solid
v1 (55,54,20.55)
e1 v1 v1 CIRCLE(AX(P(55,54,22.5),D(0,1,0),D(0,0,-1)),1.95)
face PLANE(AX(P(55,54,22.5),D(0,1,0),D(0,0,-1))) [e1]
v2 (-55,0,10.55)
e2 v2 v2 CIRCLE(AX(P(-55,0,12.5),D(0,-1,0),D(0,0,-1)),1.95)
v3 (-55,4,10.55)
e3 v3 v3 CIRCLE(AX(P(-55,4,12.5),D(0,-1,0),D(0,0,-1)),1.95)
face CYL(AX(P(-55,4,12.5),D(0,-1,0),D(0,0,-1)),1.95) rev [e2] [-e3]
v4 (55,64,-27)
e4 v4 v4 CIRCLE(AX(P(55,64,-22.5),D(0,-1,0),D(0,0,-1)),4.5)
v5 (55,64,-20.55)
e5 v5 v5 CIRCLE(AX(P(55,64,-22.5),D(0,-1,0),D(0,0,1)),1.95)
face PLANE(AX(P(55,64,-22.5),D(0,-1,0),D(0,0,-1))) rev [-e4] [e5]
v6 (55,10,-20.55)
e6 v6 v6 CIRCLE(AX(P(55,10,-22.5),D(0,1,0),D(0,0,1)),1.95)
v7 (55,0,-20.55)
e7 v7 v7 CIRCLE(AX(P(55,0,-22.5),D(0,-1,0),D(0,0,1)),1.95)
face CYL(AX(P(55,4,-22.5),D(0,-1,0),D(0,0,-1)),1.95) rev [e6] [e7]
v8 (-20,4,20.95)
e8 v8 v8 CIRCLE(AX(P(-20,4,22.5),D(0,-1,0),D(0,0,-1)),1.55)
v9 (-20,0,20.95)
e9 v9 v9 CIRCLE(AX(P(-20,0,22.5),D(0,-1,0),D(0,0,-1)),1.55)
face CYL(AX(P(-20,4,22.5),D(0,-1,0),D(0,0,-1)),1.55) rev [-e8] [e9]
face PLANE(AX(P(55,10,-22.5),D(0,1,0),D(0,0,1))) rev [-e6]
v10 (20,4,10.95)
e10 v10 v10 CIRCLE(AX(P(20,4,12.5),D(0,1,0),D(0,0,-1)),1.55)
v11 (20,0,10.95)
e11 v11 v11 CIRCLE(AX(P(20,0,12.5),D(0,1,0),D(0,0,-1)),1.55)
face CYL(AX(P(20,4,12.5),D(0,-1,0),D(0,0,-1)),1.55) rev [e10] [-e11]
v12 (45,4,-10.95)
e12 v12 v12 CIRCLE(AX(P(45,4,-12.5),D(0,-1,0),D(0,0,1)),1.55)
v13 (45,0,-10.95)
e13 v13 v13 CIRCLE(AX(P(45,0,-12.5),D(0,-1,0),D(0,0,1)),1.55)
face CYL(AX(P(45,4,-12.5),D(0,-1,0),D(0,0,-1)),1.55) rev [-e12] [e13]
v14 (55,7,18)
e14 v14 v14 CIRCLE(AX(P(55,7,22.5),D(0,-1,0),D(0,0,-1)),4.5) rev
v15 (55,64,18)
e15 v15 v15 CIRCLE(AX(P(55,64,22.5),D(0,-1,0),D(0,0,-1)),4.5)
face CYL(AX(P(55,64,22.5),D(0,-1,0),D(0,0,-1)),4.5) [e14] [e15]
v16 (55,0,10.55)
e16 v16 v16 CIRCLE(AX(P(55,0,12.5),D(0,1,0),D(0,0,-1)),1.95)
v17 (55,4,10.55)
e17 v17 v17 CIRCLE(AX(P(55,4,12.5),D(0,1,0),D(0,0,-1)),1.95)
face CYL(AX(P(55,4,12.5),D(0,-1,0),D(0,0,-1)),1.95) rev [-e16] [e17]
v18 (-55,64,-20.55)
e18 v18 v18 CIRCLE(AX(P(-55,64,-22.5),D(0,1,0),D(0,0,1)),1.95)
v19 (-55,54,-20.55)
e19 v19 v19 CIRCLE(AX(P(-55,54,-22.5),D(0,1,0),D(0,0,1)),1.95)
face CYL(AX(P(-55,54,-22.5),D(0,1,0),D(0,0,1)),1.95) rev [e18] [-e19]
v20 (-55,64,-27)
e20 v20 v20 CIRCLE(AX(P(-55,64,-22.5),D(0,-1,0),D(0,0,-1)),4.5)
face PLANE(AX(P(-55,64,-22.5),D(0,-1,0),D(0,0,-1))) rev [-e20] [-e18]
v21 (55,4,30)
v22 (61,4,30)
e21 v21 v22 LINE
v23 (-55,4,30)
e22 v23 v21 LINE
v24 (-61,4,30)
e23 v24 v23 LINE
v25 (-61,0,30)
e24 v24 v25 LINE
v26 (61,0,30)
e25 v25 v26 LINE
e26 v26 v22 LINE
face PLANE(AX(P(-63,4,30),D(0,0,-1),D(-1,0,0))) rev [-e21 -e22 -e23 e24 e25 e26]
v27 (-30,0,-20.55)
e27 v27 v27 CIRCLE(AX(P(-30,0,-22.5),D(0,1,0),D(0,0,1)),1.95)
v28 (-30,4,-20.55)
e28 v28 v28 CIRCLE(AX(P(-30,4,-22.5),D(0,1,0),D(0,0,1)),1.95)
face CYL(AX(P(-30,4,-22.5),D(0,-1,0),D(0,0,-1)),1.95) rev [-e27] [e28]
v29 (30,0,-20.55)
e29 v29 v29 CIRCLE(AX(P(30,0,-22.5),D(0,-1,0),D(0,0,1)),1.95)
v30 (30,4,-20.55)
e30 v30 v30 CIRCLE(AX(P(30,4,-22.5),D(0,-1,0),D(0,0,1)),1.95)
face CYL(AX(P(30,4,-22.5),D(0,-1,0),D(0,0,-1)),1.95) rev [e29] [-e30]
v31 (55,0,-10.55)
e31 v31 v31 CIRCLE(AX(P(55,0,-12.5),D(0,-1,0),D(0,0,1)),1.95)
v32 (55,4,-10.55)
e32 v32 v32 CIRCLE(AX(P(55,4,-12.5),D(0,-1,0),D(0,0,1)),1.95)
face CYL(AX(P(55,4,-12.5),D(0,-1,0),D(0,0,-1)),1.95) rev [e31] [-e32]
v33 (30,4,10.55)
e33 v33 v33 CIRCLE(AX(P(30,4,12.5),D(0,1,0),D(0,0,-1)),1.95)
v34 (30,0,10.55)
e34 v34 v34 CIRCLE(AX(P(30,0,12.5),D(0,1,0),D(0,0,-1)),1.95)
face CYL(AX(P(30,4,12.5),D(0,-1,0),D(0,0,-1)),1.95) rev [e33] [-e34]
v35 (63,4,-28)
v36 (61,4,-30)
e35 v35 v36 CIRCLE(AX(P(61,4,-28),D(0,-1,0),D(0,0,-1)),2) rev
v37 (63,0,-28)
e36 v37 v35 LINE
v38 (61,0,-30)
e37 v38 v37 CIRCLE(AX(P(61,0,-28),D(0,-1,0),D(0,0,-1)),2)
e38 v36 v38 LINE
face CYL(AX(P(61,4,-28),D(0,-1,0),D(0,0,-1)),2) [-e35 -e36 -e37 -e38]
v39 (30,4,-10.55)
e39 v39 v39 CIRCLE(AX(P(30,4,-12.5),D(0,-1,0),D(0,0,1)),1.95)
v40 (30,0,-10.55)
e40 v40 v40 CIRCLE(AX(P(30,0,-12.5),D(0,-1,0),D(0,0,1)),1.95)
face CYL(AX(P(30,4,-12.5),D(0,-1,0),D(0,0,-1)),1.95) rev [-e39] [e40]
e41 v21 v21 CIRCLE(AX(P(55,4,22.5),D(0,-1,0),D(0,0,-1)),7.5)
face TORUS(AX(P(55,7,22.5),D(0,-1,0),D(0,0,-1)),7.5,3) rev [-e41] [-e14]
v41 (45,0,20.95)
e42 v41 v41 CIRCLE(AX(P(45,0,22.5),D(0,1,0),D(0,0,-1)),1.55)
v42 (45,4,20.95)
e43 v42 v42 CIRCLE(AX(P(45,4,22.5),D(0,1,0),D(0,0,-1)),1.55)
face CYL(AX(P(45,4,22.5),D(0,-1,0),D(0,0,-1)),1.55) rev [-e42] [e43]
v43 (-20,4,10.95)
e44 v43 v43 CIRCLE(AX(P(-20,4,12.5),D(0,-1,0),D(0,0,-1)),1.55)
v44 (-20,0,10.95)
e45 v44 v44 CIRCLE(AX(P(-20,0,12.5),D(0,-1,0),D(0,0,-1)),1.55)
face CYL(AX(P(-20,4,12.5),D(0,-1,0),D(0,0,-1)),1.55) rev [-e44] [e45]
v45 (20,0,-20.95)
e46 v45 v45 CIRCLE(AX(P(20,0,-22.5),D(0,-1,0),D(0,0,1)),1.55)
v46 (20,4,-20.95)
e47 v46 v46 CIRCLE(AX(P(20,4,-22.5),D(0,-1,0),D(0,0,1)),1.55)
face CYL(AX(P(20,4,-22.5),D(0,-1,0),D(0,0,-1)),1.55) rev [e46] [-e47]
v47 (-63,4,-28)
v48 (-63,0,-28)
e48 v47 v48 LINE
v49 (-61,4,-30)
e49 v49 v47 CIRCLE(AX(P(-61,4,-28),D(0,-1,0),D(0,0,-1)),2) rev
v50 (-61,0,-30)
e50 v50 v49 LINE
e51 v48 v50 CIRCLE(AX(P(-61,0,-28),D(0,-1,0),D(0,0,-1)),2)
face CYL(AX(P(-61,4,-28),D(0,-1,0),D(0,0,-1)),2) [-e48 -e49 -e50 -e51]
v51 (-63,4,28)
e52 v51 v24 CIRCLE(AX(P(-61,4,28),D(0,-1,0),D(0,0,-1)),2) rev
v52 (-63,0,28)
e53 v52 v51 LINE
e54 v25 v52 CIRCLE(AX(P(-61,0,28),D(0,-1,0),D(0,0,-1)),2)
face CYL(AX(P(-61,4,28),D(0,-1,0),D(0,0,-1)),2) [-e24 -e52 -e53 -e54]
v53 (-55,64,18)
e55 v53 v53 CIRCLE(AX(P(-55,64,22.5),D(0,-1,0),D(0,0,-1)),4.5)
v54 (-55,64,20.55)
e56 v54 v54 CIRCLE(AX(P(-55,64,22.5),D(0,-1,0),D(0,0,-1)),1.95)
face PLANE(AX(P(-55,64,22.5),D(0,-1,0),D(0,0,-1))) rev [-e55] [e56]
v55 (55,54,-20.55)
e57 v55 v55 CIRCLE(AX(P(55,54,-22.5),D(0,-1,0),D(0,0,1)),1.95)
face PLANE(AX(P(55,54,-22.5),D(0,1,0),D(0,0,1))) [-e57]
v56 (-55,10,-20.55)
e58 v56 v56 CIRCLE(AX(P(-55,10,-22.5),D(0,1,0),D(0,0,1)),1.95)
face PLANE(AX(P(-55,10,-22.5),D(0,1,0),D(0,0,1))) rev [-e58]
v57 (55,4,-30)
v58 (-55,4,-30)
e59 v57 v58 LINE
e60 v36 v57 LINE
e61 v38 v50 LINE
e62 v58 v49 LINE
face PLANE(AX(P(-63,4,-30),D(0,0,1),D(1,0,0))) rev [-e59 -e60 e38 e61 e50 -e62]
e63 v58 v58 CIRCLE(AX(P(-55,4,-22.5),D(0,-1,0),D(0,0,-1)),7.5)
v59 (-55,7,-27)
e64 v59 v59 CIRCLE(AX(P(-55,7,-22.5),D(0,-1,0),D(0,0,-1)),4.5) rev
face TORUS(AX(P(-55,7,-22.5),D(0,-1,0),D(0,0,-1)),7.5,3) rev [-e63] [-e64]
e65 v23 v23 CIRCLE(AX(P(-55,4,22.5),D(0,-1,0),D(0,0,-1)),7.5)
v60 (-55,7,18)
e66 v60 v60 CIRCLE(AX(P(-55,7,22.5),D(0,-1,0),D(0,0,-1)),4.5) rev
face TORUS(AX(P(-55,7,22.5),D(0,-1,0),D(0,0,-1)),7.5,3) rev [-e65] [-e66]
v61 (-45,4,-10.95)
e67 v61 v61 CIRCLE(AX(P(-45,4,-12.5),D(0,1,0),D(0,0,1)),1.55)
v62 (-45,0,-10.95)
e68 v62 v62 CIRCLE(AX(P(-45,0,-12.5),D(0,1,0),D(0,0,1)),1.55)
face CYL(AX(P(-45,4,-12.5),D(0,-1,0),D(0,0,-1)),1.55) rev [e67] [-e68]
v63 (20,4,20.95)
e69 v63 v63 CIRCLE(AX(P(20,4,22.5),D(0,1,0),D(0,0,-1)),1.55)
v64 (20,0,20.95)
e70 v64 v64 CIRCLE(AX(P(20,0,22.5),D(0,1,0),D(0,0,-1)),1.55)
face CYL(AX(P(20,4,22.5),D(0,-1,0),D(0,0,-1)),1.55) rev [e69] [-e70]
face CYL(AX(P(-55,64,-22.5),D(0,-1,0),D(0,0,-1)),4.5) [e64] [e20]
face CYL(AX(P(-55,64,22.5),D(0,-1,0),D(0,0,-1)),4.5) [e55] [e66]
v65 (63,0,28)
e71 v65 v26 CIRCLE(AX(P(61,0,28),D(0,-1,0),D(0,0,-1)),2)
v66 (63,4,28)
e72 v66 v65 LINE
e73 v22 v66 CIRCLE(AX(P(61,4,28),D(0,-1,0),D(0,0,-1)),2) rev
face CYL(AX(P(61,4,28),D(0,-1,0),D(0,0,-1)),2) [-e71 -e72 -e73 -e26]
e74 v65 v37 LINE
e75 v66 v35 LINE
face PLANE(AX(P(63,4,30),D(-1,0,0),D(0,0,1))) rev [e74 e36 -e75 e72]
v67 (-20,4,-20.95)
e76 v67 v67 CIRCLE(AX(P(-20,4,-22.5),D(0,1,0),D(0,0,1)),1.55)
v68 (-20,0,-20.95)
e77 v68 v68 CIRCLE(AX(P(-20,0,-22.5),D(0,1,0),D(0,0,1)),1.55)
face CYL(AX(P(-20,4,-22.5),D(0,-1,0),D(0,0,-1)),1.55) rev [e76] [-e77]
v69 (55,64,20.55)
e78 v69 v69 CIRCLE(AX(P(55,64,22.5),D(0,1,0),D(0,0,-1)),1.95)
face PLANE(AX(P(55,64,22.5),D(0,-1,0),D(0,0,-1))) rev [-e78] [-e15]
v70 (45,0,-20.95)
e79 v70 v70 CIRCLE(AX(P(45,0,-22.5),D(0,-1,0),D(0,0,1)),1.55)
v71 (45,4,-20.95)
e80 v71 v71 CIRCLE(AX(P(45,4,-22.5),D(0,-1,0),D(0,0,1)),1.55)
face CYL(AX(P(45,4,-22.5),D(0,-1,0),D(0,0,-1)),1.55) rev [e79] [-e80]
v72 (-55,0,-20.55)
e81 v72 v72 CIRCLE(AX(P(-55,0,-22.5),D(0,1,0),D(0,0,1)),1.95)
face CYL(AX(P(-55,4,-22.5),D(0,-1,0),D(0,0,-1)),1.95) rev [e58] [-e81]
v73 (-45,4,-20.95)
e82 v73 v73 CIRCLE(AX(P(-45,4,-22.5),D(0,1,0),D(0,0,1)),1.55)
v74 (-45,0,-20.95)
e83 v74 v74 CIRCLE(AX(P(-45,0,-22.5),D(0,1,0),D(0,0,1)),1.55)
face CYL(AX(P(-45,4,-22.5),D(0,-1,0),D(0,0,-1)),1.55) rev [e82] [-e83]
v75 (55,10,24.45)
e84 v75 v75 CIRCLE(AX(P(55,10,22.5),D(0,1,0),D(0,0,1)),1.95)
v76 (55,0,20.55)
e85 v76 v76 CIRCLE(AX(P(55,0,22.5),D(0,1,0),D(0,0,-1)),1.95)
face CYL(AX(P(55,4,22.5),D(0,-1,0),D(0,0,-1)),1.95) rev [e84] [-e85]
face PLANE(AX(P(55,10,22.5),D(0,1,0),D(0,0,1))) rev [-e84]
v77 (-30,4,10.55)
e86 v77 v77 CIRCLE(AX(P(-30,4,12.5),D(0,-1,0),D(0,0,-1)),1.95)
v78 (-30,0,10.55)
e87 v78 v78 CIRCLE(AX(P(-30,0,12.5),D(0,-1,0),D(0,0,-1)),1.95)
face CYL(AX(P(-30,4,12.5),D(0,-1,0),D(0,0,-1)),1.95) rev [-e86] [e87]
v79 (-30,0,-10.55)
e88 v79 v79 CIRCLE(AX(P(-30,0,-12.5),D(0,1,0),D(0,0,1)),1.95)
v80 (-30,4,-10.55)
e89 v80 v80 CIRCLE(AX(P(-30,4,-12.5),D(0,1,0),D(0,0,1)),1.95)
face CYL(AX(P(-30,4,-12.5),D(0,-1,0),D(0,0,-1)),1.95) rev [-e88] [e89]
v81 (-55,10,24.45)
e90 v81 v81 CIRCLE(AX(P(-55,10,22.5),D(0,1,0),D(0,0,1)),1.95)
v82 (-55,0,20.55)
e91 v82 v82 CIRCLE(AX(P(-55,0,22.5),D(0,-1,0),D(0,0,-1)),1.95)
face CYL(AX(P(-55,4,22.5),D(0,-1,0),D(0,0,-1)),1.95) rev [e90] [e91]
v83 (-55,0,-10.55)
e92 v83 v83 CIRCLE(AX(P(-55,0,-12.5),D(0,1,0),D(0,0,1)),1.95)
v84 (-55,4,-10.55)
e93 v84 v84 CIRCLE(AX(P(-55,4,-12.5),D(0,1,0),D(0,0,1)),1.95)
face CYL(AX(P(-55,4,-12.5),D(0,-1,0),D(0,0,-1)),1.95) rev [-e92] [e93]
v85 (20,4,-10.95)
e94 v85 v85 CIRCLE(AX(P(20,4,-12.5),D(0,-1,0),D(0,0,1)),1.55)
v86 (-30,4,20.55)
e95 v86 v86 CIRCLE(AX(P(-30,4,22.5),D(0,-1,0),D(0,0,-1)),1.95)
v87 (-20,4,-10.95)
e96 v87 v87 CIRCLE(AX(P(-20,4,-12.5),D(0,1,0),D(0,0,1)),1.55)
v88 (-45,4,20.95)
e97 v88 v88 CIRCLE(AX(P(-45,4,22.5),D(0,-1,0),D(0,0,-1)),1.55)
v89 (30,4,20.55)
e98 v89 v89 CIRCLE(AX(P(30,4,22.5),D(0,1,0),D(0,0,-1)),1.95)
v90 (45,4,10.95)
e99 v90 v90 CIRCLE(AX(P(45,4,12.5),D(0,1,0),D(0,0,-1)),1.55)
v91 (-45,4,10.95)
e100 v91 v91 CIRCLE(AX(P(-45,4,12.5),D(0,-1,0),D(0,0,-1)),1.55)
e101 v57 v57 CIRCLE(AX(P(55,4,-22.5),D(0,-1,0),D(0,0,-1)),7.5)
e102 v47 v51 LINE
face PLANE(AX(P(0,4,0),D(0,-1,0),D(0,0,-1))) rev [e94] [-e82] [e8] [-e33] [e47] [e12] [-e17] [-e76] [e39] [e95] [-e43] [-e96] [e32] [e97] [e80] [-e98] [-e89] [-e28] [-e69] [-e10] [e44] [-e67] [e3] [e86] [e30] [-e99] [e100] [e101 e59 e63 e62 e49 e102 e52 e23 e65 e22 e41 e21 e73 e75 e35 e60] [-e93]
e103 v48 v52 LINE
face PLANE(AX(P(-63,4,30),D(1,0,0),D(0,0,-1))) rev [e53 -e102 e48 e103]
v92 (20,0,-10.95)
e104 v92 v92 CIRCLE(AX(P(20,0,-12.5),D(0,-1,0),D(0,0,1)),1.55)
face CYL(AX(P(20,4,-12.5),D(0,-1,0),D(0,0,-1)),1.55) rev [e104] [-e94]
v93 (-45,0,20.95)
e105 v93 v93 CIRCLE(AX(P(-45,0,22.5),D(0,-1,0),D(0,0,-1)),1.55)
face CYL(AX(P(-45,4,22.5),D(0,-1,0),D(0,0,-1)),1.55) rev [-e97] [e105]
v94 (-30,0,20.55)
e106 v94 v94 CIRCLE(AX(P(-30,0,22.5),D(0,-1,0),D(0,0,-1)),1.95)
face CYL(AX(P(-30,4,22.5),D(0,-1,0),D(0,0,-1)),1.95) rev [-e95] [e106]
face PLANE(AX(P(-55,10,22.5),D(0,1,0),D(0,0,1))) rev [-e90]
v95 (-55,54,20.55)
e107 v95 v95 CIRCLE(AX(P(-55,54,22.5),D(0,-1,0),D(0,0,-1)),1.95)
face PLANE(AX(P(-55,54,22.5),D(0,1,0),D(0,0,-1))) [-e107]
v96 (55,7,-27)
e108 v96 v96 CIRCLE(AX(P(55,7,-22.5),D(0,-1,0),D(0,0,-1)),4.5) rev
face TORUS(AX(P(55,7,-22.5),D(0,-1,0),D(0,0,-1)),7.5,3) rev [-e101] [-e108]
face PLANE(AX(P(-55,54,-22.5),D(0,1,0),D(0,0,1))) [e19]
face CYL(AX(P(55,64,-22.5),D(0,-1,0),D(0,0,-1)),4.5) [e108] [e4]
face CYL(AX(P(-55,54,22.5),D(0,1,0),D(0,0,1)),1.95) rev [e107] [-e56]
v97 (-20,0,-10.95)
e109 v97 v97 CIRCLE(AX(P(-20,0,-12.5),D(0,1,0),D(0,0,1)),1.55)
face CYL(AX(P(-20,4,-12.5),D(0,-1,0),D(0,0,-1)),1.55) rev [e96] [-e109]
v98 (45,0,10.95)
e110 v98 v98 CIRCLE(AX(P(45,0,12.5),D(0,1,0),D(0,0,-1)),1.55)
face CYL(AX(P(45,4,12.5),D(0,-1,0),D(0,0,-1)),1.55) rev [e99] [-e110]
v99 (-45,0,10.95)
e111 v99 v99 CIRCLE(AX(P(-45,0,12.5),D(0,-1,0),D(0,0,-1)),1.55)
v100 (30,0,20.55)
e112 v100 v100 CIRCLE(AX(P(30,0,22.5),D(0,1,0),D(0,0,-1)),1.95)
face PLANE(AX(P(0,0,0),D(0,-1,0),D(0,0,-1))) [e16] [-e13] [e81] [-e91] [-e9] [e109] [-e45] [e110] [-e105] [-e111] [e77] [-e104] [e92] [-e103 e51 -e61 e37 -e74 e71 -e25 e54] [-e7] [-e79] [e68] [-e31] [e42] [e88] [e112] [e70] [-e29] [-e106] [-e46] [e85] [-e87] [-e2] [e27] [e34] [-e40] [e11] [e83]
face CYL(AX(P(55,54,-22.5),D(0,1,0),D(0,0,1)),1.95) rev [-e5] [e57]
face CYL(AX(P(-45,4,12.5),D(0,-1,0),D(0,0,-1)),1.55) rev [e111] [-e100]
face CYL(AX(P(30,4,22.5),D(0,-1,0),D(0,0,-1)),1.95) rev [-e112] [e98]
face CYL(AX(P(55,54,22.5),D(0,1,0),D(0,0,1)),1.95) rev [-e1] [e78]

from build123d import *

# Parameters (mm, degrees)
SKETCH3_W                                    = 126
SKETCH3_H                                    = 60
BOSS_EXTRUDE1_DEPTH                          = 4
SKETCH4_R                                    = 1.95
SKETCH4_R_2                                  = 1.55
CUT_EXTRUDE1_DEPTH                           = 70.89277502
LPATTERN1_COUNT                              = 2
LPATTERN1_PITCH                              = 25
LPATTERN1_COUNT_DIR2                         = 2
LPATTERN1_PITCH_DIR2                         = 10
MIRROR1_COPY_1_SKETCH_R                      = 1.95
MIRROR1_COPY_1_SKETCH_R_2                    = 1.55
MIRROR1_COPY_1_DEPTH                         = 70.89277502
MIRROR1_COPY_2_SKETCH_R                      = 1.95
MIRROR1_COPY_2_SKETCH_R_2                    = 1.55
MIRROR1_COPY_2_DEPTH                         = 70.89277502
MIRROR1_COPY_3_SKETCH_R                      = 1.95
MIRROR1_COPY_3_SKETCH_R_2                    = 1.55
MIRROR1_COPY_3_DEPTH                         = 70.89277502
MIRROR1_AT_THE_SECOND_PLANE_COPY_1_SKETC_R   = 1.95
MIRROR1_AT_THE_SECOND_PLANE_COPY_1_SKETC_R_2 = 1.55
MIRROR1_AT_THE_SECOND_PLANE_COPY_1_DEPTH     = 70.89277502
MIRROR1_AT_THE_SECOND_PLANE_COPY_2_SKETC_R   = 1.95
MIRROR1_AT_THE_SECOND_PLANE_COPY_2_SKETC_R_2 = 1.55
MIRROR1_AT_THE_SECOND_PLANE_COPY_2_DEPTH     = 70.89277502
MIRROR1_AT_THE_SECOND_PLANE_COPY_3_SKETC_R   = 1.95
MIRROR1_AT_THE_SECOND_PLANE_COPY_3_SKETC_R_2 = 1.55
MIRROR1_AT_THE_SECOND_PLANE_COPY_3_DEPTH     = 70.89277502
MIRROR1_AT_THE_SECOND_PLANE_COPY_4_SKETC_R   = 1.95
MIRROR1_AT_THE_SECOND_PLANE_COPY_4_SKETC_R_2 = 1.55
MIRROR1_AT_THE_SECOND_PLANE_COPY_4_DEPTH     = 70.89277502
MIRROR1_AT_THE_SECOND_PLANE_COPY_5_SKETC_R   = 1.95
MIRROR1_AT_THE_SECOND_PLANE_COPY_5_SKETC_R_2 = 1.55
MIRROR1_AT_THE_SECOND_PLANE_COPY_5_DEPTH     = 70.89277502
MIRROR1_AT_THE_SECOND_PLANE_COPY_6_SKETC_R   = 1.95
MIRROR1_AT_THE_SECOND_PLANE_COPY_6_SKETC_R_2 = 1.55
MIRROR1_AT_THE_SECOND_PLANE_COPY_6_DEPTH     = 70.89277502
MIRROR1_AT_THE_SECOND_PLANE_COPY_7_SKETC_R   = 1.95
MIRROR1_AT_THE_SECOND_PLANE_COPY_7_SKETC_R_2 = 1.55
MIRROR1_AT_THE_SECOND_PLANE_COPY_7_DEPTH     = 70.89277502
FILLET1_R                                    = 2
BOSS_EXTRUDE2_START                          = 4
SKETCH5_R                                    = 4.5
BOSS_EXTRUDE2_DEPTH                          = 60
MIRROR2_START                                = 4
MIRROR2_AT_THE_SECOND_PLANE_COPY_1_SKETC_R   = 4.5
MIRROR2_AT_THE_SECOND_PLANE_COPY_1_DEPTH     = 60
FILLET2_R                                    = 3
CUT_EXTRUDE2_START                           = -10
SKETCH6_R                                    = 1.95
CUT_EXTRUDE2_DEPTH                           = 10
MIRROR3_START                                = -10
MIRROR3_AT_THE_SECOND_PLANE_COPY_1_SKETC_R   = 1.95
MIRROR3_AT_THE_SECOND_PLANE_COPY_1_DEPTH     = 10
SKETCH7_R                                    = 1.95
CUT_EXTRUDE3_DEPTH                           = 10


with BuildPart() as part:
    # Sketch3 → Boss-Extrude1 (new body)
    with BuildSketch(Plane(origin=(0, 0, 0), x_dir=(1, 0, 0), z_dir=(0, 1, 0))):
        Rectangle(SKETCH3_W, SKETCH3_H)
    extrude(amount=BOSS_EXTRUDE1_DEPTH)

    # Sketch4 → Cut-Extrude1 (cut, through all)
    with BuildSketch(Plane(origin=(0, 0, 0), x_dir=(1, 0, 0), z_dir=(0, 1, 0))):
        with Locations(Location((-55, 22.5, 0), (0, 0, 270))):
            Circle(SKETCH4_R)
        with Locations(Location((-45, 22.5, 0), (0, 0, 270))):
            Circle(SKETCH4_R_2)
    cut_extrude1 = extrude(amount=CUT_EXTRUDE1_DEPTH, mode=Mode.SUBTRACT)

    # LPattern1: Cut-Extrude1 2 × 2
    with Locations(*[(i * LPATTERN1_PITCH, 0, j * LPATTERN1_PITCH_DIR2) for i in range(LPATTERN1_COUNT) for j in range(LPATTERN1_COUNT_DIR2) if (i, j) != (0, 0)]):
        add(cut_extrude1, mode=Mode.SUBTRACT)

    # Mirror1: Cut-Extrude1 across plane
    add(cut_extrude1.mirror(Plane(origin=(0, 0, 0), x_dir=(0, 0, 1), z_dir=(1, 0, 0))), mode=Mode.SUBTRACT)

    # Mirror1 copy 1 sketch → Mirror1 copy 1 (cut, through all)
    with BuildSketch(Plane(origin=(0, 0, 10), x_dir=(-1, 0, 0), z_dir=(0, 1, 0))):
        with Locations((-55, -22.5)):
            Circle(MIRROR1_COPY_1_SKETCH_R)
        with Locations((-45, -22.5)):
            Circle(MIRROR1_COPY_1_SKETCH_R_2)
    extrude(amount=MIRROR1_COPY_1_DEPTH, mode=Mode.SUBTRACT)

    # Mirror1 copy 2 sketch → Mirror1 copy 2 (cut, through all)
    with BuildSketch(Plane(origin=(-25, 0, 0), x_dir=(-1, 0, 0), z_dir=(0, 1, 0))):
        with Locations((-55, -22.5)):
            Circle(MIRROR1_COPY_2_SKETCH_R)
        with Locations((-45, -22.5)):
            Circle(MIRROR1_COPY_2_SKETCH_R_2)
    extrude(amount=MIRROR1_COPY_2_DEPTH, mode=Mode.SUBTRACT)

    # Mirror1 copy 3 sketch → Mirror1 copy 3 (cut, through all)
    with BuildSketch(Plane(origin=(-25, 0, 10), x_dir=(-1, 0, 0), z_dir=(0, 1, 0))):
        with Locations((-55, -22.5)):
            Circle(MIRROR1_COPY_3_SKETCH_R)
        with Locations((-45, -22.5)):
            Circle(MIRROR1_COPY_3_SKETCH_R_2)
    extrude(amount=MIRROR1_COPY_3_DEPTH, mode=Mode.SUBTRACT)

    # Mirror1 at the second plane: Cut-Extrude1 across plane
    add(cut_extrude1.mirror(Plane.XY), mode=Mode.SUBTRACT)

    # Mirror1 at the second plane copy 1 sketc → Mirror1 at the second plane copy 1 (cut, through all)
    with BuildSketch(Plane(origin=(0, 0, -10), x_dir=(1, 0, 0), z_dir=(0, 1, 0))):
        with Locations((-55, -22.5)):
            Circle(MIRROR1_AT_THE_SECOND_PLANE_COPY_1_SKETC_R)
        with Locations((-45, -22.5)):
            Circle(MIRROR1_AT_THE_SECOND_PLANE_COPY_1_SKETC_R_2)
    extrude(amount=MIRROR1_AT_THE_SECOND_PLANE_COPY_1_DEPTH, mode=Mode.SUBTRACT)

    # Mirror1 at the second plane copy 2 sketc → Mirror1 at the second plane copy 2 (cut, through all)
    with BuildSketch(Plane(origin=(25, 0, 0), x_dir=(1, 0, 0), z_dir=(0, 1, 0))):
        with Locations((-55, -22.5)):
            Circle(MIRROR1_AT_THE_SECOND_PLANE_COPY_2_SKETC_R)
        with Locations((-45, -22.5)):
            Circle(MIRROR1_AT_THE_SECOND_PLANE_COPY_2_SKETC_R_2)
    extrude(amount=MIRROR1_AT_THE_SECOND_PLANE_COPY_2_DEPTH, mode=Mode.SUBTRACT)

    # Mirror1 at the second plane copy 3 sketc → Mirror1 at the second plane copy 3 (cut, through all)
    with BuildSketch(Plane(origin=(25, 0, -10), x_dir=(1, 0, 0), z_dir=(0, 1, 0))):
        with Locations((-55, -22.5)):
            Circle(MIRROR1_AT_THE_SECOND_PLANE_COPY_3_SKETC_R)
        with Locations((-45, -22.5)):
            Circle(MIRROR1_AT_THE_SECOND_PLANE_COPY_3_SKETC_R_2)
    extrude(amount=MIRROR1_AT_THE_SECOND_PLANE_COPY_3_DEPTH, mode=Mode.SUBTRACT)

    # Mirror1 at the second plane copy 4 sketc → Mirror1 at the second plane copy 4 (cut, through all)
    with BuildSketch(Plane(origin=(0, 0, 0), x_dir=(-1, 0, 0), z_dir=(0, 1, 0))):
        with Locations(Location((-55, 22.5, 0), (0, 0, 270))):
            Circle(MIRROR1_AT_THE_SECOND_PLANE_COPY_4_SKETC_R)
        with Locations(Location((-45, 22.5, 0), (0, 0, 270))):
            Circle(MIRROR1_AT_THE_SECOND_PLANE_COPY_4_SKETC_R_2)
    extrude(amount=MIRROR1_AT_THE_SECOND_PLANE_COPY_4_DEPTH, mode=Mode.SUBTRACT)

    # Mirror1 at the second plane copy 5 sketc → Mirror1 at the second plane copy 5 (cut, through all)
    with BuildSketch(Plane(origin=(0, 0, -10), x_dir=(-1, 0, 0), z_dir=(0, 1, 0))):
        with Locations(Location((-55, 22.5, 0), (0, 0, 270))):
            Circle(MIRROR1_AT_THE_SECOND_PLANE_COPY_5_SKETC_R)
        with Locations(Location((-45, 22.5, 0), (0, 0, 270))):
            Circle(MIRROR1_AT_THE_SECOND_PLANE_COPY_5_SKETC_R_2)
    extrude(amount=MIRROR1_AT_THE_SECOND_PLANE_COPY_5_DEPTH, mode=Mode.SUBTRACT)

    # Mirror1 at the second plane copy 6 sketc → Mirror1 at the second plane copy 6 (cut, through all)
    with BuildSketch(Plane(origin=(-25, 0, 0), x_dir=(-1, 0, 0), z_dir=(0, 1, 0))):
        with Locations(Location((-55, 22.5, 0), (0, 0, 270))):
            Circle(MIRROR1_AT_THE_SECOND_PLANE_COPY_6_SKETC_R)
        with Locations(Location((-45, 22.5, 0), (0, 0, 270))):
            Circle(MIRROR1_AT_THE_SECOND_PLANE_COPY_6_SKETC_R_2)
    extrude(amount=MIRROR1_AT_THE_SECOND_PLANE_COPY_6_DEPTH, mode=Mode.SUBTRACT)

    # Mirror1 at the second plane copy 7 sketc → Mirror1 at the second plane copy 7 (cut, through all)
    with BuildSketch(Plane(origin=(-25, 0, -10), x_dir=(-1, 0, 0), z_dir=(0, 1, 0))):
        with Locations(Location((-55, 22.5, 0), (0, 0, 270))):
            Circle(MIRROR1_AT_THE_SECOND_PLANE_COPY_7_SKETC_R)
        with Locations(Location((-45, 22.5, 0), (0, 0, 270))):
            Circle(MIRROR1_AT_THE_SECOND_PLANE_COPY_7_SKETC_R_2)
    extrude(amount=MIRROR1_AT_THE_SECOND_PLANE_COPY_7_DEPTH, mode=Mode.SUBTRACT)

    # Fillet1
    fillet1_edges = [part.edges().sort_by_distance(p)[0] for p in [
        (63, 2, 30),
        (-63, 2, 30),
        (-63, 2, -30),
        (63, 2, -30),
    ]]
    fillet(fillet1_edges, radius=FILLET1_R)

    # Sketch5 → Boss-Extrude2 (add)
    with BuildSketch(Plane(origin=(0, 0, 0), x_dir=(1, 0, 0), z_dir=(0, 1, 0)).offset(BOSS_EXTRUDE2_START)):
        with Locations(Location((-55, 22.5, 0), (0, 0, 90))):
            Circle(SKETCH5_R)
    boss_extrude2 = extrude(amount=BOSS_EXTRUDE2_DEPTH)

    # Mirror2: Boss-Extrude2 across plane
    add(boss_extrude2.mirror(Plane(origin=(0, 0, 0), x_dir=(0, 0, 1), z_dir=(1, 0, 0))))

    # Mirror2 at the second plane: Boss-Extrude2 across plane
    add(boss_extrude2.mirror(Plane.XY))

    # Mirror2 at the second plane copy 1 sketc → Mirror2 at the second plane copy 1 (add)
    with BuildSketch(Plane(origin=(0, 0, 0), x_dir=(-1, 0, 0), z_dir=(0, 1, 0)).offset(MIRROR2_START)):
        with Locations(Location((-55, 22.5, 0), (0, 0, 90))):
            Circle(MIRROR2_AT_THE_SECOND_PLANE_COPY_1_SKETC_R)
    extrude(amount=MIRROR2_AT_THE_SECOND_PLANE_COPY_1_DEPTH)

    # Fillet2
    fillet2_edges = [part.edges().sort_by_distance(p)[0] for p in [
        (-55, 4, -18),
        (-55, 4, 18),
        (55, 4, -18),
        (55, 4, 18),
    ]]
    fillet(fillet2_edges, radius=FILLET2_R - 0.0001)  # a hair under: the kernel refuses the full size

    # Sketch6 → Cut-Extrude2 (cut)
    with BuildSketch(Plane(origin=(0, 64, 0), x_dir=(1, 0, 0), z_dir=(0, 1, 0)).offset(CUT_EXTRUDE2_START)):
        with Locations(Location((-55, 22.5, 0), (0, 0, 90))):
            Circle(SKETCH6_R)
    cut_extrude2 = extrude(amount=CUT_EXTRUDE2_DEPTH, mode=Mode.SUBTRACT)

    # Mirror3: Cut-Extrude2 across plane
    add(cut_extrude2.mirror(Plane.XY), mode=Mode.SUBTRACT)

    # Mirror3 at the second plane: Cut-Extrude2 across plane
    add(cut_extrude2.mirror(Plane(origin=(0, 0, 0), x_dir=(0, 0, 1), z_dir=(1, 0, 0))), mode=Mode.SUBTRACT)

    # Mirror3 at the second plane copy 1 sketc → Mirror3 at the second plane copy 1 (cut)
    with BuildSketch(Plane(origin=(0, 64, 0), x_dir=(-1, 0, 0), z_dir=(0, 1, 0)).offset(MIRROR3_START)):
        with Locations(Location((-55, 22.5, 0), (0, 0, 90))):
            Circle(MIRROR3_AT_THE_SECOND_PLANE_COPY_1_SKETC_R)
    extrude(amount=MIRROR3_AT_THE_SECOND_PLANE_COPY_1_DEPTH, mode=Mode.SUBTRACT)

    # Sketch7 → Cut-Extrude3 (cut)
    with BuildSketch(Plane(origin=(0, 0, 0), x_dir=(1, 0, 0), z_dir=(0, 1, 0))):
        with Locations(Location((55, -22.5, 0), (0, 0, 90))):
            Circle(SKETCH7_R)
        with Locations(Location((55, 22.5, 0), (0, 0, 270))):
            Circle(SKETCH7_R)
        with Locations(Location((-55, -22.5, 0), (0, 0, 90))):
            Circle(SKETCH7_R)
        with Locations(Location((-55, 22.5, 0), (0, 0, 270))):
            Circle(SKETCH7_R)
    extrude(amount=CUT_EXTRUDE3_DEPTH, mode=Mode.SUBTRACT)


solid = part.part
